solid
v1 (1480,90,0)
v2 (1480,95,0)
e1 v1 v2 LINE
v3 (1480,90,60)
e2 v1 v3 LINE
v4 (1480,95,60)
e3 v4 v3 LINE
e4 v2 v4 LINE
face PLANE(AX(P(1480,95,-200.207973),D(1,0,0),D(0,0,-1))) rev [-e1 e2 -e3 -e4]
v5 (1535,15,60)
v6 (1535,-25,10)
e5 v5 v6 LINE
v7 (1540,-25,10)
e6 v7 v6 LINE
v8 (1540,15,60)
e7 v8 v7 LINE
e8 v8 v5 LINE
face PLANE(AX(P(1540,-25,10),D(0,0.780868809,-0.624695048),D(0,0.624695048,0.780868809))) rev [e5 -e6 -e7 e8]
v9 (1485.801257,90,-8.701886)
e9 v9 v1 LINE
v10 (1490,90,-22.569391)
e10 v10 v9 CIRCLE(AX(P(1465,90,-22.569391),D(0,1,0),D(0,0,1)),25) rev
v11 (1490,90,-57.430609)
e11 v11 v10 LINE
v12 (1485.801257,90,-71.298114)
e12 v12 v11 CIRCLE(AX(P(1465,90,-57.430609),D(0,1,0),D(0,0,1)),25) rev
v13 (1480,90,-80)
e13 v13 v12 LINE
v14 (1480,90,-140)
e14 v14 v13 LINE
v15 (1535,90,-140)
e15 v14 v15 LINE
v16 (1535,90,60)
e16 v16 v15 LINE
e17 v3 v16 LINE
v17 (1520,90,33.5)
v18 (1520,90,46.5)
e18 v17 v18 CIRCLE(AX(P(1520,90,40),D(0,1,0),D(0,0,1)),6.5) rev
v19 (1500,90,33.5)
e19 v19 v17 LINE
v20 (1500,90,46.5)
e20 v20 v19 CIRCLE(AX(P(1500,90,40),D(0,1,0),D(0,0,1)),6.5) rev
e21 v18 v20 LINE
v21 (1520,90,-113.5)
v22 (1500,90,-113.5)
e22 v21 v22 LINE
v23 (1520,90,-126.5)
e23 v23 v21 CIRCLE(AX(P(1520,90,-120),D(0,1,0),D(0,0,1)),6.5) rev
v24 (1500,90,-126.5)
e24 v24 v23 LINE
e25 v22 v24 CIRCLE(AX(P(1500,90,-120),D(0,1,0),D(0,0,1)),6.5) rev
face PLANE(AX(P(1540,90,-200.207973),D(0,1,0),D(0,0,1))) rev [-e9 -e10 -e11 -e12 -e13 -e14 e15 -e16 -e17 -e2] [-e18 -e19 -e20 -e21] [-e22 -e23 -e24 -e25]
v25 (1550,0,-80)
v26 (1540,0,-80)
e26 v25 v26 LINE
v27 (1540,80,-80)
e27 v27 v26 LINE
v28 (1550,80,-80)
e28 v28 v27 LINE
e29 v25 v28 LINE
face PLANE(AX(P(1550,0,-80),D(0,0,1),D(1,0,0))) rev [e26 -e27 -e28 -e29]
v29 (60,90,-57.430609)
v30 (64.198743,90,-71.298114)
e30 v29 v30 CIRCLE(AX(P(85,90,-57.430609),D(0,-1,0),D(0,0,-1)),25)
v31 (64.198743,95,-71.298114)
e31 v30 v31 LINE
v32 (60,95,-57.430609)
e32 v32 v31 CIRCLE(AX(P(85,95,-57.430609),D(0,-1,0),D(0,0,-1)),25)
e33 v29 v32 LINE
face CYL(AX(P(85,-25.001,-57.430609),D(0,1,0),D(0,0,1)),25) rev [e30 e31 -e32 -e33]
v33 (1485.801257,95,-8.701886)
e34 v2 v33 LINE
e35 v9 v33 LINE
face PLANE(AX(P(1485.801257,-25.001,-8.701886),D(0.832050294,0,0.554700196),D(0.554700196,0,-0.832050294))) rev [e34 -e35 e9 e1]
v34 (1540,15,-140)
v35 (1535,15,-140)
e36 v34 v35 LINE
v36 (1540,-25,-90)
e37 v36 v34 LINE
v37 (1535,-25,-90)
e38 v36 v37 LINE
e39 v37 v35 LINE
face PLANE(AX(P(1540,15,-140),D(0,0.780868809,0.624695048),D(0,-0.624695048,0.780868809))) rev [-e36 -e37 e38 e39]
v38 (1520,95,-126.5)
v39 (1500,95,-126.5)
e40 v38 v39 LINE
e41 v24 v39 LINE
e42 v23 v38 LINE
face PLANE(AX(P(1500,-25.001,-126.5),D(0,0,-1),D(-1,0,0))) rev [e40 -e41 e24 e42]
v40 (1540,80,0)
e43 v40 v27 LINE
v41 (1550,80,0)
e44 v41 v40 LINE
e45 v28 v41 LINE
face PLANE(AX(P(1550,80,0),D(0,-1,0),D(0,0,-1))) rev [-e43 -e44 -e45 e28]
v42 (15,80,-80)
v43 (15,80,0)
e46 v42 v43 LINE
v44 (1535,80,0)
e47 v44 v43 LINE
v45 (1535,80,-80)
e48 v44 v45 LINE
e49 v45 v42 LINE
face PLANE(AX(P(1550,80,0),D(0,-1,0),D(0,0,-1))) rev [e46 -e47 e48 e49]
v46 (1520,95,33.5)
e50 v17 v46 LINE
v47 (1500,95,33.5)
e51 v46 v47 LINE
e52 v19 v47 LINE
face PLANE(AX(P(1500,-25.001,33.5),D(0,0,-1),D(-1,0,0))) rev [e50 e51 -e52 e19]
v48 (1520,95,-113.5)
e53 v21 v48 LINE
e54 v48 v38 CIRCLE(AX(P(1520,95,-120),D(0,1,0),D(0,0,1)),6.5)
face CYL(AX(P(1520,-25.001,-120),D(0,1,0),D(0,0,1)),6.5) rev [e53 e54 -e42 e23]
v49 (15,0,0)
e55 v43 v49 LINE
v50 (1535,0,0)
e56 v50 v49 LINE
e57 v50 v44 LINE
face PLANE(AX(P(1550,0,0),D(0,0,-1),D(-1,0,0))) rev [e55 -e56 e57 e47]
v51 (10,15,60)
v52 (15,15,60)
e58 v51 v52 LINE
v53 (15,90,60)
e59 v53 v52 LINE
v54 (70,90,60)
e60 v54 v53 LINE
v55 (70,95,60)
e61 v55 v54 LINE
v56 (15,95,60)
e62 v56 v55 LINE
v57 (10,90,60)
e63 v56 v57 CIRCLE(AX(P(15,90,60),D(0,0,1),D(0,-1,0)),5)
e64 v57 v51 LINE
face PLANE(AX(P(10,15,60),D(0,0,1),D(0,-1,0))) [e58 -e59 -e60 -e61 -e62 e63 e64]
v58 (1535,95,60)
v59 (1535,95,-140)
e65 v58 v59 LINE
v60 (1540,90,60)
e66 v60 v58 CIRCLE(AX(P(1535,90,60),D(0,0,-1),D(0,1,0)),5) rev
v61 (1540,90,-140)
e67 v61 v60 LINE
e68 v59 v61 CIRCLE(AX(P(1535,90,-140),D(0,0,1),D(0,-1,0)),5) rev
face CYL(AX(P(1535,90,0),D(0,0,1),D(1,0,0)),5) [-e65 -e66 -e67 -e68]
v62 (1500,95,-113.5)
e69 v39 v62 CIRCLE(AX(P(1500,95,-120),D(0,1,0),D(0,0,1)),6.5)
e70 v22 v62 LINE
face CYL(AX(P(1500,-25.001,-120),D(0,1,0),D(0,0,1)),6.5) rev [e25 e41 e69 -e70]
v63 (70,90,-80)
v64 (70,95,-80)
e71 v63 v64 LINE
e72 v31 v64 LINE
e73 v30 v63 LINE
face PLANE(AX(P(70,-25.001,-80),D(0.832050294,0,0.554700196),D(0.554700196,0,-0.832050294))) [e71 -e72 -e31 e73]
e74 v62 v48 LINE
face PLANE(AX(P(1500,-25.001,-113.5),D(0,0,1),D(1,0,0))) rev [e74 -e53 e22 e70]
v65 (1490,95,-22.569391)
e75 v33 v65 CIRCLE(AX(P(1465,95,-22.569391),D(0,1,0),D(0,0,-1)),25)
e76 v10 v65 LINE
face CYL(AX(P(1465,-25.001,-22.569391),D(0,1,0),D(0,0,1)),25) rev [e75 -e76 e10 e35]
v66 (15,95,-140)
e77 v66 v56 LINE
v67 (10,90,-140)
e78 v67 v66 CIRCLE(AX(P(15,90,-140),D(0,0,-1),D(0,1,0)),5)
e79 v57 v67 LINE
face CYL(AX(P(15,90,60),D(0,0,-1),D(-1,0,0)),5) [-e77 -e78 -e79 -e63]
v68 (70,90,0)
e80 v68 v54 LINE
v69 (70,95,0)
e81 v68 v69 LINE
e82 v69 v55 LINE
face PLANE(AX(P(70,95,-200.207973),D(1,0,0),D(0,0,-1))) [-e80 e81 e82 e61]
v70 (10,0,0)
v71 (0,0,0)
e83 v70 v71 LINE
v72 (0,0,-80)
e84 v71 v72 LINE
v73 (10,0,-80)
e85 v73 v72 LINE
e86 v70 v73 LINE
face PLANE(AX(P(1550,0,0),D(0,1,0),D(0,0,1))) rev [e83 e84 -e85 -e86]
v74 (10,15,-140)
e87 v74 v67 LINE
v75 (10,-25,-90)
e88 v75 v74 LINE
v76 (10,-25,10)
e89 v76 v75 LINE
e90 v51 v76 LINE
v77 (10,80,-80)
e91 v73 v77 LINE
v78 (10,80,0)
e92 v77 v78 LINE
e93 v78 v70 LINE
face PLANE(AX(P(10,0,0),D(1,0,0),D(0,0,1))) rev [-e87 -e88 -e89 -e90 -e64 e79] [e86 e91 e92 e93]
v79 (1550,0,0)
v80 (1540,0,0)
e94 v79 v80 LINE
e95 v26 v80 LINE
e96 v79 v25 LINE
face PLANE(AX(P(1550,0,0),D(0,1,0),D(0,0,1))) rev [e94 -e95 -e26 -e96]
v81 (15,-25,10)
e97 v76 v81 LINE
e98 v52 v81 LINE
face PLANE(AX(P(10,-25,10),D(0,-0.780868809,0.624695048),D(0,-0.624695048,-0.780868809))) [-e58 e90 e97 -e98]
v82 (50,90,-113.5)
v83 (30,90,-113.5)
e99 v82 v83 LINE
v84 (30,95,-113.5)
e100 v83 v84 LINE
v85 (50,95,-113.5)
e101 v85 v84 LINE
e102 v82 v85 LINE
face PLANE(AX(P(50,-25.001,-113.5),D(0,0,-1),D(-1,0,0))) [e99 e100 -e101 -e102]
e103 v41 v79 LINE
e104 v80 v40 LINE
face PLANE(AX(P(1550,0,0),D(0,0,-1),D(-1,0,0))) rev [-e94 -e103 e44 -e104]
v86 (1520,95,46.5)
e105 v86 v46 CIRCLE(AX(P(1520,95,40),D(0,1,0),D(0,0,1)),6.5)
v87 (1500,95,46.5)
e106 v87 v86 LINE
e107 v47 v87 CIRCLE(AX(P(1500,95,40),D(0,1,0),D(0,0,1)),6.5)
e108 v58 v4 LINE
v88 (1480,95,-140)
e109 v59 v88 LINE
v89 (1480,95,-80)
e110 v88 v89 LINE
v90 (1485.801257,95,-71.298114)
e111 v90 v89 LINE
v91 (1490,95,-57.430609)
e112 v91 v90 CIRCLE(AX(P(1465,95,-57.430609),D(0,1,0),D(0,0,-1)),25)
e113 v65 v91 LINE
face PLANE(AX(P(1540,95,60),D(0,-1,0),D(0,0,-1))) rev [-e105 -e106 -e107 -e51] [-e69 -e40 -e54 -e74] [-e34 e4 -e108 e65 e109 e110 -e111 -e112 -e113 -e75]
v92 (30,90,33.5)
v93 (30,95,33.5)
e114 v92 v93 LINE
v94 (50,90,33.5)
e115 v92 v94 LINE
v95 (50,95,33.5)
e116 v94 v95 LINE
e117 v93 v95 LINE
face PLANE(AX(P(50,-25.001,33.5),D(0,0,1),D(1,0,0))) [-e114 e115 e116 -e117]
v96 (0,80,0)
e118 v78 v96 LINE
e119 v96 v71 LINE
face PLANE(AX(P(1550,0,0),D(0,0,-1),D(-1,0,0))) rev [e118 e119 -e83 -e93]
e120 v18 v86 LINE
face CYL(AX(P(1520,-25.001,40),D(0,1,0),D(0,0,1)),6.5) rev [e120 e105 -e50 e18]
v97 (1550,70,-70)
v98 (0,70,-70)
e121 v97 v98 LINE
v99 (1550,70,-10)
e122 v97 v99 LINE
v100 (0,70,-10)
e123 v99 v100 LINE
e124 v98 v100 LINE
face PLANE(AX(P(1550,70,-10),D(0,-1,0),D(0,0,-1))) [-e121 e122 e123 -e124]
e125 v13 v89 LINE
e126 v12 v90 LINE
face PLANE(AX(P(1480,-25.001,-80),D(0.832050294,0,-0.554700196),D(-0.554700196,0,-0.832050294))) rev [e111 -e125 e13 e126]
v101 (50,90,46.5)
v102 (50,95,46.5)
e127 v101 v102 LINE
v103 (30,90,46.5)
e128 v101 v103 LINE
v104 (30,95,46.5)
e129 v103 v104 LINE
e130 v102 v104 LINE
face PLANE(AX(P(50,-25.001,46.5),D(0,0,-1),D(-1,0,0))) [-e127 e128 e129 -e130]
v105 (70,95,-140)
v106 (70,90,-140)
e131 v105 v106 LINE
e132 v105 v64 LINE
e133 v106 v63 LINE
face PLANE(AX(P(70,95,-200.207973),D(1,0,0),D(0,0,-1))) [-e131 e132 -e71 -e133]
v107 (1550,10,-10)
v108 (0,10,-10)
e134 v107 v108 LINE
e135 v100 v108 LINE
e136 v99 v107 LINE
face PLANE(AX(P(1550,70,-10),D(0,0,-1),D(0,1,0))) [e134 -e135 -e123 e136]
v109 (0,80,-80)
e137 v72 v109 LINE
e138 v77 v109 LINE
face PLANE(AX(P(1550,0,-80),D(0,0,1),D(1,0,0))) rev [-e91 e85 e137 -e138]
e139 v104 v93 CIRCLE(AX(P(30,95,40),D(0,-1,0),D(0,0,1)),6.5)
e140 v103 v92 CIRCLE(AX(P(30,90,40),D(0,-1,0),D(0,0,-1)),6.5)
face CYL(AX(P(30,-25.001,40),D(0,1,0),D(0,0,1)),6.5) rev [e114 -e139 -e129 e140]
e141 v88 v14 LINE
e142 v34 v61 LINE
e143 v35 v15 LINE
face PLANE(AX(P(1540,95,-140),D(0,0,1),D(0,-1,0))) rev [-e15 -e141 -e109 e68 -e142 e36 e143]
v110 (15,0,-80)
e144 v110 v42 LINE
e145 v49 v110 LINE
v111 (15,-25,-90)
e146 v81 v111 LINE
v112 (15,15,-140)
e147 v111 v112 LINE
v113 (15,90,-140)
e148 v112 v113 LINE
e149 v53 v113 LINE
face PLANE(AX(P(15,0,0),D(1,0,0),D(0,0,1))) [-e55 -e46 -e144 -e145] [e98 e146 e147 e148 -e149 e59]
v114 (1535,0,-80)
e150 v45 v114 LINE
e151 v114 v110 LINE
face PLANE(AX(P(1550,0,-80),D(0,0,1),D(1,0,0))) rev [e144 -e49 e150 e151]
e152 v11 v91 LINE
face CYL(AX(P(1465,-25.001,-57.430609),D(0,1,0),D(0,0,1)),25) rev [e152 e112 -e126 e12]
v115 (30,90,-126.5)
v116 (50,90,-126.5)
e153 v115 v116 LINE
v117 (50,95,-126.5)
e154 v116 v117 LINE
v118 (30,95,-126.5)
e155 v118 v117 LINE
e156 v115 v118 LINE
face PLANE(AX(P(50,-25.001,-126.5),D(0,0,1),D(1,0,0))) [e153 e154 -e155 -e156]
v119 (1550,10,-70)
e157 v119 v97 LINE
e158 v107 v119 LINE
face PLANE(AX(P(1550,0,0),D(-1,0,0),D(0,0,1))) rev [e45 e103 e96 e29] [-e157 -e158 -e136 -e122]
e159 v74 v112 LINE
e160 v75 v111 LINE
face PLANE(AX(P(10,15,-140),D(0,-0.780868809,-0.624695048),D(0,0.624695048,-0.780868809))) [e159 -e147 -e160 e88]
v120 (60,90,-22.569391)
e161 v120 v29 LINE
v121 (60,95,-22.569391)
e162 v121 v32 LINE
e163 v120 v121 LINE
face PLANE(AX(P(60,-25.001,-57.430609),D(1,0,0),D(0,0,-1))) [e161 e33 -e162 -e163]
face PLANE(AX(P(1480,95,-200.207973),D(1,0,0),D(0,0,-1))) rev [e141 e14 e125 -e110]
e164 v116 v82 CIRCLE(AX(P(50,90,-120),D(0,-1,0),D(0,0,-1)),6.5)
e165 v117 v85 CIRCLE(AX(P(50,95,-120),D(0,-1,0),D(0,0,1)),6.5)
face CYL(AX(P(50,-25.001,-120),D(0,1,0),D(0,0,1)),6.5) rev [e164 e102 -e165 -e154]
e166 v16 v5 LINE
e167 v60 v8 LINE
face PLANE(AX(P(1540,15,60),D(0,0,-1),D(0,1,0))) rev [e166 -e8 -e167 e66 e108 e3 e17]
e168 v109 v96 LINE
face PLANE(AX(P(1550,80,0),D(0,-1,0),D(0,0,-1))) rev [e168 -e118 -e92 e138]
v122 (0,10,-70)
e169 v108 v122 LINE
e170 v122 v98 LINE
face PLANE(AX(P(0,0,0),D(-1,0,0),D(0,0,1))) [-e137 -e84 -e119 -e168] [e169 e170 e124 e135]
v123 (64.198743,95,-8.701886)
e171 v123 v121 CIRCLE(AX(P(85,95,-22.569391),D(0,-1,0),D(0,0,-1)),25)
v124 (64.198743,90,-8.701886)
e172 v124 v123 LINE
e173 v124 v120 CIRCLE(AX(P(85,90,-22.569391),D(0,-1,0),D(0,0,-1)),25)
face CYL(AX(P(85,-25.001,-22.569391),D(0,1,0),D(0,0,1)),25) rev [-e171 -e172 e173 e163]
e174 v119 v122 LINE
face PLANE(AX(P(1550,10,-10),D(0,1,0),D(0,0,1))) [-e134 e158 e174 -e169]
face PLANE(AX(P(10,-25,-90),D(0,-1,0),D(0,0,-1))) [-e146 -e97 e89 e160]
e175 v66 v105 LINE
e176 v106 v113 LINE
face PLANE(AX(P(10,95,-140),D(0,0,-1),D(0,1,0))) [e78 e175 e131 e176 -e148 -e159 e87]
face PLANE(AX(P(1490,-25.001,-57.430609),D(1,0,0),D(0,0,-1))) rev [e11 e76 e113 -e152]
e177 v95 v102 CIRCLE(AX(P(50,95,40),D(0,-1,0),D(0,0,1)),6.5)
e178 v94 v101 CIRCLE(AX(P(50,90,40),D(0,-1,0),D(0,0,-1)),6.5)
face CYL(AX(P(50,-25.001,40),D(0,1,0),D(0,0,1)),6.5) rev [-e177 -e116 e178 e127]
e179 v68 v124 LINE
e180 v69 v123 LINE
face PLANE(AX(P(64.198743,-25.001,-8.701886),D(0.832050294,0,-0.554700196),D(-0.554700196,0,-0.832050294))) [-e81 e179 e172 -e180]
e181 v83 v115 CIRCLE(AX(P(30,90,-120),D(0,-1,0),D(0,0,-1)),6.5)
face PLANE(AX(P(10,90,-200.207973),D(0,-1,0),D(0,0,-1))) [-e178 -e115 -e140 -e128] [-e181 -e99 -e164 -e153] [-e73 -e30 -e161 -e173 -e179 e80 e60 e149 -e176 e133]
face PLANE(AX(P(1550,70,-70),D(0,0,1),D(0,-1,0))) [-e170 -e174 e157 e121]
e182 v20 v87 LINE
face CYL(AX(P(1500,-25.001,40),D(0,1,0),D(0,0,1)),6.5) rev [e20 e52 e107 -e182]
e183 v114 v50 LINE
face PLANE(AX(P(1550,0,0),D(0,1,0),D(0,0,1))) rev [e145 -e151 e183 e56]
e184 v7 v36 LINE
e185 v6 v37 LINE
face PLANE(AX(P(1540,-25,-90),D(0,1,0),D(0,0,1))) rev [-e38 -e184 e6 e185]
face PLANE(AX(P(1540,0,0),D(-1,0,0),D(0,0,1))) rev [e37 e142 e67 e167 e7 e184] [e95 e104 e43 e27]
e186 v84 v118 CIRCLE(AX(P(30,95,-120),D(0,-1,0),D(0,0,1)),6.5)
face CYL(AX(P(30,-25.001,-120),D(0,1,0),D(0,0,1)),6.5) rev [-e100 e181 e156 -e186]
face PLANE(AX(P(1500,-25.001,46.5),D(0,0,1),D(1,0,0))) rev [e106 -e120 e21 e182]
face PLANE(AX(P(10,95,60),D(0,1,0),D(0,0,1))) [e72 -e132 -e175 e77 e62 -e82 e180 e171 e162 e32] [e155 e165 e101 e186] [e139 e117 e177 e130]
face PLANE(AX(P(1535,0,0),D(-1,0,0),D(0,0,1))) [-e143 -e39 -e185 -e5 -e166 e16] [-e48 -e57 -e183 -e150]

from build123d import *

# Parameters (mm, degrees)
SKETCH3_W                       = 80
SKETCH3_H                       = 80
SKETCH3_W_2                     = 60
SKETCH3_H_2                     = 60
BOSS_EXTRUDE2_DEPTH             = 1550
SKETCH7_W                       = 60
SKETCH7_H                       = 60
BOSS_EXTRUDE3_DEPTH             = 5
BOSS_EXTRUDE4_REACH             = 1561.207
SKETCH8_W                       = 60
SKETCH8_H                       = 5
BOSS_EXTRUDE4_DIRECTION_2_REACH = 1561.207
CUT_EXTRUDE1_REACH              = 1562.929
CUT_EXTRUDE2_REACH              = 1562.929
FILLET1_R                       = 5
MIRROR1_START                   = -90
MIRROR1_DEPTH                   = 10
MIRROR1_2_DEPTH                 = 10
MIRROR1_START_2                 = -80
MIRROR1_3_OUTLINE_W             = 5
MIRROR1_3_OUTLINE_H             = 25
MIRROR1_3_DEPTH                 = 80
MIRROR1_START_3                 = 10
MIRROR1_4_DEPTH                 = 31.124
MIRROR1_START_4                 = -119.452
MIRROR1_5_DEPTH                 = 29.452
MIRROR1_START_5                 = -140
MIRROR1_6_DEPTH                 = 200
MIRROR1_7_DEPTH                 = 5
FILLET1_OF_MIRROR2_R            = 5


with BuildPart() as part:
    # Sketch3 → Boss-Extrude2 (new body)
    with BuildSketch(Plane(origin=(0, 0, 0), x_dir=(0, 0, -1), z_dir=(1, 0, 0))):
        with Locations((40, 40)):
            Rectangle(SKETCH3_W, SKETCH3_H)
        with Locations((40, 40)):
            Rectangle(SKETCH3_W_2, SKETCH3_H_2, mode=Mode.SUBTRACT)
    extrude(amount=BOSS_EXTRUDE2_DEPTH)

    # Sketch7 → Boss-Extrude3 (add)
    with BuildSketch(Plane(origin=(1535, 0, 0), x_dir=(0, 0, -1), z_dir=(1, 0, 0))):
        Polygon((-60, 95), (140, 95), (140, 15), (90, -25), (-10, -25), (-60, 15), align=None)
        with Locations((40, 40)):
            Rectangle(SKETCH7_W, SKETCH7_H, mode=Mode.SUBTRACT)
    boss_extrude3 = extrude(amount=BOSS_EXTRUDE3_DEPTH)

    # Boss-Extrude4: up to this face of the body (flat: up to its plane)
    boss_extrude4_end = Plane(part.part.faces().sort_by_distance((1537.5, 55, -140))[0])
    # Sketch8 → Boss-Extrude4 (add, up to the picked face)
    with BuildSketch(Plane(origin=(0, 0, -80), x_dir=(-1, 0, 0), z_dir=(0, 0, -1)), mode=Mode.PRIVATE) as boss_extrude4_sk1:
        with Locations((-1510, 92.5)):
            Rectangle(SKETCH8_W, SKETCH8_H)
    boss_extrude4_tool1 = split(extrude(boss_extrude4_sk1.sketch, amount=BOSS_EXTRUDE4_REACH, mode=Mode.PRIVATE), bisect_by=boss_extrude4_end, keep=Keep.BOTH, mode=Mode.PRIVATE)
    boss_extrude4 = boss_extrude4_tool1.solids().sort_by(Axis((1510, 92.5, -80), (0, 0, -1)))[0]
    add(boss_extrude4)

    # Boss-Extrude4 direction 2: up to this face of the body (flat: up to its plane)
    boss_extrude4_direction_2_end = Plane(part.part.faces().sort_by_distance((1537.5, 55, 60))[0])
    # Sketch8 → Boss-Extrude4 direction 2 (add, up to the picked face)
    with BuildSketch(Plane(origin=(0, 0, -80), x_dir=(-1, 0, 0), z_dir=(0, 0, -1)), mode=Mode.PRIVATE) as boss_extrude4_direction_2_sk1:
        with Locations((-1510, 92.5)):
            Rectangle(SKETCH8_W, SKETCH8_H)
    boss_extrude4_direction_2_tool1 = split(extrude(boss_extrude4_direction_2_sk1.sketch, amount=-BOSS_EXTRUDE4_DIRECTION_2_REACH, mode=Mode.PRIVATE), bisect_by=boss_extrude4_direction_2_end, keep=Keep.BOTH, mode=Mode.PRIVATE)
    boss_extrude4_direction_2 = boss_extrude4_direction_2_tool1.solids().sort_by(Axis((1510, 92.5, -80), (0, 0, 1)))[0]
    add(boss_extrude4_direction_2)

    # Sketch9 → Cut-Extrude1 (cut, up to next)
    with BuildSketch(Plane(origin=(0, 95, 0), x_dir=(1, 0, 0), z_dir=(0, 1, 0)), mode=Mode.PRIVATE) as cut_extrude1_sk1:
        with BuildLine():
            Line((1480, 80), (1485.801257358, 71.298113962))
            ThreePointArc((1485.801257358, 71.298113962), (1488.927300662, 64.675212774), (1490, 57.430609057))
            Line((1490, 57.430609057), (1490, 22.569390943))
            ThreePointArc((1490, 22.569390943), (1488.927300662, 15.324787226), (1485.801257358, 8.701886038))
            Line((1485.801257358, 8.701886038), (1480, 0))
            Line((1480, 0), (1480, 80))
        make_face()
    cut_extrude1_tool1 = extrude(cut_extrude1_sk1.sketch, amount=-CUT_EXTRUDE1_REACH, mode=Mode.PRIVATE) & part.part
    cut_extrude1 = cut_extrude1_tool1.solids().sort_by_distance((1484.537596, 95, -40))[0]
    add(cut_extrude1, mode=Mode.SUBTRACT)

    # Sketch10 → Cut-Extrude2 (cut, up to next)
    with BuildSketch(Plane(origin=(0, 95, 0), x_dir=(1, 0, 0), z_dir=(0, 1, 0)), mode=Mode.PRIVATE) as cut_extrude2_sk1:
        with BuildLine():
            Line((1500, 126.5), (1520, 126.5))
            ThreePointArc((1520, 126.5), (1526.5, 120), (1520, 113.5))
            Line((1520, 113.5), (1500, 113.5))
            ThreePointArc((1500, 113.5), (1493.5, 120), (1500, 126.5))
        make_face()
    cut_extrude2_tool1 = extrude(cut_extrude2_sk1.sketch, amount=-CUT_EXTRUDE2_REACH, mode=Mode.PRIVATE) & part.part
    # Sketch10 → Cut-Extrude2 (cut, up to next)
    with BuildSketch(Plane(origin=(0, 95, 0), x_dir=(1, 0, 0), z_dir=(0, 1, 0)), mode=Mode.PRIVATE) as cut_extrude2_sk2:
        with BuildLine():
            Line((1500, -33.5), (1520, -33.5))
            ThreePointArc((1520, -33.5), (1526.5, -40), (1520, -46.5))
            Line((1520, -46.5), (1500, -46.5))
            ThreePointArc((1500, -46.5), (1493.5, -40), (1500, -33.5))
        make_face()
    cut_extrude2_tool2 = extrude(cut_extrude2_sk2.sketch, amount=-CUT_EXTRUDE2_REACH, mode=Mode.PRIVATE) & part.part
    cut_extrude2_1 = cut_extrude2_tool1.solids().sort_by_distance((1510, 95, -120))[0]
    add(cut_extrude2_1, mode=Mode.SUBTRACT)
    cut_extrude2_2 = cut_extrude2_tool2.solids().sort_by_distance((1510, 95, 40))[0]
    add(cut_extrude2_2, mode=Mode.SUBTRACT)
    cut_extrude2 = cut_extrude2_1 + cut_extrude2_2  # Cut-Extrude2 as one shape, for the pattern or mirror that repeats it

    # Fillet1
    fillet1_edges = [part.edges().sort_by_distance(p)[0] for p in [
        (1540, 95, -40),
    ]]
    fillet(fillet1_edges, radius=FILLET1_R)

    # Mirror1: read off the stored shape, not the designer's step
    # Mirror1 outline → Mirror1 (add)
    with BuildSketch(Plane.XY.offset(MIRROR1_START)):
        with BuildLine():
            Line((10, 90), (10, -25))
            Line((10, -25), (15, -25))
            Line((15, -25), (15, 95))
            ThreePointArc((15, 95), (11.464466094, 93.535533906), (10, 90))
        make_face()
    extrude(amount=MIRROR1_DEPTH)

    # Mirror1 2 outline → Mirror1 2 (add)
    with BuildSketch(Plane.XY):
        with BuildLine():
            Line((10, 90), (10, -25))
            Line((10, -25), (15, -25))
            Line((15, -25), (15, 95))
            ThreePointArc((15, 95), (11.464466094, 93.535533906), (10, 90))
        make_face()
    extrude(amount=MIRROR1_2_DEPTH)

    # Mirror1 3 outline → Mirror1 3 (add)
    with BuildSketch(Plane.XY.offset(MIRROR1_START_2)):
        with Locations((12.5, -12.5)):
            Rectangle(MIRROR1_3_OUTLINE_W, MIRROR1_3_OUTLINE_H)
        with BuildLine():
            Line((10, 90), (10, 80))
            Line((10, 80), (15, 80))
            Line((15, 80), (15, 95))
            ThreePointArc((15, 95), (11.464466094, 93.535533906), (10, 90))
        make_face()
    extrude(amount=MIRROR1_3_DEPTH)

    # Mirror1 4 outline → Mirror1 4 (add)
    with BuildSketch(Plane.XY.offset(MIRROR1_START_3)):
        with BuildLine():
            Line((10, 0), (15, 0))
            Line((15, 0), (15, 95))
            ThreePointArc((15, 95), (11.464466094, 93.535533906), (10, 90))
            Line((10, 90), (10, 0))
        make_face()
    extrude(amount=MIRROR1_4_DEPTH)

    # Mirror1 5 outline → Mirror1 5 (add)
    with BuildSketch(Plane.XY.offset(MIRROR1_START_4)):
        with BuildLine():
            Line((10, 0), (15, 0))
            Line((15, 0), (15, 95))
            ThreePointArc((15, 95), (11.464466094, 93.535533906), (10, 90))
            Line((10, 90), (10, 0))
        make_face()
    extrude(amount=MIRROR1_5_DEPTH)

    # Mirror1 6 outline → Mirror1 6 (add)
    with BuildSketch(Plane.XY.offset(MIRROR1_START_5)):
        with BuildLine():
            Line((10, 90), (10, 80))
            Line((10, 80), (15, 80))
            Line((15, 80), (15, 95))
            ThreePointArc((15, 95), (11.464466094, 93.535533906), (10, 90))
        make_face()
    extrude(amount=MIRROR1_6_DEPTH)

    # Mirror1 7 outline → Mirror1 7 (add)
    with BuildSketch(Plane.YZ.offset(MIRROR1_START_3)):
        Polygon((80, 41.124), (80, 60), (15, 60), (-25, 10), (0, 10), (0, 41.124), align=None)
        Polygon((0, -90), (-25, -90), (15, -140), (80, -140), (80, -119.452), (0, -119.452), align=None)
    extrude(amount=MIRROR1_7_DEPTH)

    # Mirror2: Boss-Extrude3, Boss-Extrude4, Boss-Extrude4 direction 2, Cut-Extrude1, Cut-Extrude2 across plane
    add(boss_extrude3.mirror(Plane(origin=(775, 0, 0), x_dir=(0, 0, 1), z_dir=(1, 0, 0))))
    add(boss_extrude4.mirror(Plane(origin=(775, 0, 0), x_dir=(0, 0, 1), z_dir=(1, 0, 0))))
    add(boss_extrude4_direction_2.mirror(Plane(origin=(775, 0, 0), x_dir=(0, 0, 1), z_dir=(1, 0, 0))))
    add(cut_extrude1.mirror(Plane(origin=(775, 0, 0), x_dir=(0, 0, 1), z_dir=(1, 0, 0))), mode=Mode.SUBTRACT)
    add(cut_extrude2.mirror(Plane(origin=(775, 0, 0), x_dir=(0, 0, 1), z_dir=(1, 0, 0))), mode=Mode.SUBTRACT)

    # Fillet1 of Mirror2
    fillet1_of_mirror2_edges = [part.edges().sort_by_distance(p)[0] for p in [
        (10, 95, -40),
    ]]
    fillet(fillet1_of_mirror2_edges, radius=FILLET1_OF_MIRROR2_R)


solid = part.part
